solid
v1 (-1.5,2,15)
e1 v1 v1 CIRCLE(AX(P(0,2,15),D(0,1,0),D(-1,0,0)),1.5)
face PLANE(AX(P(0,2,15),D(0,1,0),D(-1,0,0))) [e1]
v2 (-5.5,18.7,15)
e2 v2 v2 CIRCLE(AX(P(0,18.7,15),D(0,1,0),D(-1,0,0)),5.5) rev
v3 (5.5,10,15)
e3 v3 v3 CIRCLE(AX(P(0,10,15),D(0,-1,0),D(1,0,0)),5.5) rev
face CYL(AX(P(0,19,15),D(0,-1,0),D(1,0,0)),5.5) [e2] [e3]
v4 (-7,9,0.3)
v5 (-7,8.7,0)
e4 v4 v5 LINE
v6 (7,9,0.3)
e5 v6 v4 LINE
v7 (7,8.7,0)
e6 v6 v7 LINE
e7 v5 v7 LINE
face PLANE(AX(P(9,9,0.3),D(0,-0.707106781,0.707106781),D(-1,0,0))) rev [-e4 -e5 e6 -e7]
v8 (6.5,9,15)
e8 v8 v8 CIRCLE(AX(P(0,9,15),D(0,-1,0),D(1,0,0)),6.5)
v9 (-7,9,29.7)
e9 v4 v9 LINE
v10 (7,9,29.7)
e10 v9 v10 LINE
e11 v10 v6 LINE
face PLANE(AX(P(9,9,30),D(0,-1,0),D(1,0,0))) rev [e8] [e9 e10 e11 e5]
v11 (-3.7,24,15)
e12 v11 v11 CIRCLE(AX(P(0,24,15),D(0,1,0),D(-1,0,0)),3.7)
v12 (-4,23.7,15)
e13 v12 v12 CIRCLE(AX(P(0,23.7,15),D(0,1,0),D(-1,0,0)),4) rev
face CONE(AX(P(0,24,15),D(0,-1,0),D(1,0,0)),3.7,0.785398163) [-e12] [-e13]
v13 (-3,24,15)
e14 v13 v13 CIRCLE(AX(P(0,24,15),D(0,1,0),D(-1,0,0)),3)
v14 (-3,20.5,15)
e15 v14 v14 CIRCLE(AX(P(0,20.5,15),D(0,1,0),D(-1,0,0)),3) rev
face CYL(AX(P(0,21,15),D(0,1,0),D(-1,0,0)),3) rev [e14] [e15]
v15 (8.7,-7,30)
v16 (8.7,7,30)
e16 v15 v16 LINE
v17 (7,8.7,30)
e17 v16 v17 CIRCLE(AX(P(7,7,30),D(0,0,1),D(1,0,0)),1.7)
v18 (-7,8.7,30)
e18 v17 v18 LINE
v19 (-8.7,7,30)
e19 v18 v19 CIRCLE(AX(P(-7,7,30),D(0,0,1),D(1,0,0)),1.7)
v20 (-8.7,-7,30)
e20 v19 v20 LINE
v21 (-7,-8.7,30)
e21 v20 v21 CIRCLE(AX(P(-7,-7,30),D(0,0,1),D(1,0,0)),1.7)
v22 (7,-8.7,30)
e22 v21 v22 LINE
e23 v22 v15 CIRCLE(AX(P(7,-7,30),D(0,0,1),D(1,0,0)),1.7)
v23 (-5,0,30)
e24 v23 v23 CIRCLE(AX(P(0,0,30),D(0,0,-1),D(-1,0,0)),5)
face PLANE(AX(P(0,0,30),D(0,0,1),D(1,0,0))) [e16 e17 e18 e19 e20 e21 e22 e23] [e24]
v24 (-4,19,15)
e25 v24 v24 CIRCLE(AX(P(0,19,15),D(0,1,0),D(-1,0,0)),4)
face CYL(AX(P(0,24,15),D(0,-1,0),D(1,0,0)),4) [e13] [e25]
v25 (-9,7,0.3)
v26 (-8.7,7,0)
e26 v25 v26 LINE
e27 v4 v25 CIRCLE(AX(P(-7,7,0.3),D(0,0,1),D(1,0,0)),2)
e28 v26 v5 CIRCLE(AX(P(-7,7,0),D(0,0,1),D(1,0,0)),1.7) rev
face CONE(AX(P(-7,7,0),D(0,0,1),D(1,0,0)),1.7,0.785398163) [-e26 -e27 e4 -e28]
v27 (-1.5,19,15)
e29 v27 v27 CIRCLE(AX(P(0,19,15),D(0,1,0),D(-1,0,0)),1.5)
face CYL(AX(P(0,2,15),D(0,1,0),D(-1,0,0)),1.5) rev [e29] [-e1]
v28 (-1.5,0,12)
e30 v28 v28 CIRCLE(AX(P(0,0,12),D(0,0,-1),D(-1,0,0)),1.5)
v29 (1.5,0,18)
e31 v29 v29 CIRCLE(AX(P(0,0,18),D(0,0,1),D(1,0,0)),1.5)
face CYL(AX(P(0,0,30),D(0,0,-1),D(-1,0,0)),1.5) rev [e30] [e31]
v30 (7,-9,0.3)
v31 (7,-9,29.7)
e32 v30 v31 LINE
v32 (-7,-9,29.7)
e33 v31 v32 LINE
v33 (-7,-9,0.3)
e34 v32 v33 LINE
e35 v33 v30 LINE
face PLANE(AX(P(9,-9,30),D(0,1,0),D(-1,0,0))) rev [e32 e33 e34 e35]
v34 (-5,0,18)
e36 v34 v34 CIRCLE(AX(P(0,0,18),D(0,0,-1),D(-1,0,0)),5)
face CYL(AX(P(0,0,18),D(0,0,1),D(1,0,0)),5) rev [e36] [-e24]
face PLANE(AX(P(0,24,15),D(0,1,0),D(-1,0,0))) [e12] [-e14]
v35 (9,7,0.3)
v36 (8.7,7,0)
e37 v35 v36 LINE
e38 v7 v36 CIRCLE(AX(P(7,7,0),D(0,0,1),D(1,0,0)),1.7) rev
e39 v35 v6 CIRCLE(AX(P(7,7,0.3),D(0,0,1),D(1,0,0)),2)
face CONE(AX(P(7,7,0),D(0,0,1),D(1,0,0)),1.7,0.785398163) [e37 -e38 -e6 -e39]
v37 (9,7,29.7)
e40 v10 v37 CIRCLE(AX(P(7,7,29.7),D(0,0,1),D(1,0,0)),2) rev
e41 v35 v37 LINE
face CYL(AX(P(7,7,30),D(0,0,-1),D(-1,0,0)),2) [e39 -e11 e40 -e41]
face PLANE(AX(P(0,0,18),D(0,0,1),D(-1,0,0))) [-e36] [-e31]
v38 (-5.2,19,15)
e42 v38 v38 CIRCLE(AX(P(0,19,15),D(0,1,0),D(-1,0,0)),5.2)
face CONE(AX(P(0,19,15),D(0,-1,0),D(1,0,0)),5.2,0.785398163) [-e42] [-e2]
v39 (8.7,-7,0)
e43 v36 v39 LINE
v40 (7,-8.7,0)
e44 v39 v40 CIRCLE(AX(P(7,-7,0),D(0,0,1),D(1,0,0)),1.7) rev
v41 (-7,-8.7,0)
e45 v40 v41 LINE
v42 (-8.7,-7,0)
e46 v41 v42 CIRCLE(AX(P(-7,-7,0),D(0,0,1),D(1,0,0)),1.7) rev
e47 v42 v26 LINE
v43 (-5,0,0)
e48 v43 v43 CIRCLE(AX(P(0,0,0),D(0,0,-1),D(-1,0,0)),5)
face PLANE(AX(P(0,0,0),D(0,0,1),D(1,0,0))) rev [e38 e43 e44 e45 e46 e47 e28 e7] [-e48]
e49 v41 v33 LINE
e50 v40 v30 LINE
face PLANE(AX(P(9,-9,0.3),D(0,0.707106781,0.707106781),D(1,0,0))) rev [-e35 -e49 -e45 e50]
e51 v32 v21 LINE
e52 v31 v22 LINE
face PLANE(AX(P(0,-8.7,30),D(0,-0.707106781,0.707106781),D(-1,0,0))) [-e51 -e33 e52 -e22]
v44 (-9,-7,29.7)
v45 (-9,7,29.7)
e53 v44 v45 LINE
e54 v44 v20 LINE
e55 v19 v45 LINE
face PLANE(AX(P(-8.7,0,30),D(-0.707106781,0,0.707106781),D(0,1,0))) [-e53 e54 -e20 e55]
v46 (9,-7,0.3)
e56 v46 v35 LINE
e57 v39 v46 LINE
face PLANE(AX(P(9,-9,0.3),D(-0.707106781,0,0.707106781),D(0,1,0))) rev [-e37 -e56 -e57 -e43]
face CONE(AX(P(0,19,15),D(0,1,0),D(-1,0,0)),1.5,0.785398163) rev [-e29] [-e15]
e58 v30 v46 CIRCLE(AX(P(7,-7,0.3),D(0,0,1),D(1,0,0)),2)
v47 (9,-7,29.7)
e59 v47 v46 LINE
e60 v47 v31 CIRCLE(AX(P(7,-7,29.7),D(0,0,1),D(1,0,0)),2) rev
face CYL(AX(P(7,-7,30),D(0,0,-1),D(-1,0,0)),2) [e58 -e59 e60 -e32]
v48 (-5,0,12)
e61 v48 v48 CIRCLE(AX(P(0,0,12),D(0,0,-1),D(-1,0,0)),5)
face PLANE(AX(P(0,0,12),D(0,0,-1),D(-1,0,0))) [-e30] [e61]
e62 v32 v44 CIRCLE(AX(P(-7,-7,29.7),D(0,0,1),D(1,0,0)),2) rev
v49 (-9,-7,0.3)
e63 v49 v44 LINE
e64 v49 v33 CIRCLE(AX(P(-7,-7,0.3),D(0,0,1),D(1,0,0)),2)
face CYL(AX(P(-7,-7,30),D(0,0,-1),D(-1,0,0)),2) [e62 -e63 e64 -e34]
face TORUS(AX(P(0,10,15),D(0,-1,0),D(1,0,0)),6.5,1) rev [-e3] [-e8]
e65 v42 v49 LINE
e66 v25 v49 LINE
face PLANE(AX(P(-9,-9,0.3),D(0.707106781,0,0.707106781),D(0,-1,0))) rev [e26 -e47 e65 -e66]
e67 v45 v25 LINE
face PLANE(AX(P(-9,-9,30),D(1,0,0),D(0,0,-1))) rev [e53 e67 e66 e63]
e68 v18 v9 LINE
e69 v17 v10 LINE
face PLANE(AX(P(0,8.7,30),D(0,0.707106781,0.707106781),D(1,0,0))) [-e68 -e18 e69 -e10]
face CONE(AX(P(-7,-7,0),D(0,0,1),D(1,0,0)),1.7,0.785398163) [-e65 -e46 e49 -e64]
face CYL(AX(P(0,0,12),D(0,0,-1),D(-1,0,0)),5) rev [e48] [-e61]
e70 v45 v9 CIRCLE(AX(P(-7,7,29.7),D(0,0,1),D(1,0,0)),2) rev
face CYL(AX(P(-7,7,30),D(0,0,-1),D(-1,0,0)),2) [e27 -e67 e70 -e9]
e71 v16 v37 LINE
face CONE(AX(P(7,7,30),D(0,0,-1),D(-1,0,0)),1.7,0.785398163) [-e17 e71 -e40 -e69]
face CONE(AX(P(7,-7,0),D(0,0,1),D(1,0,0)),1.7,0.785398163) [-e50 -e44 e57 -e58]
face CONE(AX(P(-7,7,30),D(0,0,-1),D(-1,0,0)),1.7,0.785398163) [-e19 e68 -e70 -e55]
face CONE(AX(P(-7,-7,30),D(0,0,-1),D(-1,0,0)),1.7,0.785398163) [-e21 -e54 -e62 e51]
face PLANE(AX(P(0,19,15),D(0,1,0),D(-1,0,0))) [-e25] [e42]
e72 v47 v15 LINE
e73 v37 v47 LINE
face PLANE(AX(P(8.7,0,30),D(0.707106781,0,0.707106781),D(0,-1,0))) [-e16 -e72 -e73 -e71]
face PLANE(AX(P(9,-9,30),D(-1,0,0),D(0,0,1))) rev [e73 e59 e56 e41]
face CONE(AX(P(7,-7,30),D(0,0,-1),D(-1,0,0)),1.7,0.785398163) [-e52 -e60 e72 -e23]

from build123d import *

# Parameters (mm, degrees)
SKETCH1_W           = 18
SKETCH1_H           = 18
BOSS_EXTRUDE1_DEPTH = 30
FILLET1_R           = 2
SKETCH2_R           = 5
CUT_EXTRUDE1_DEPTH  = 12
SKETCH3_R           = 5.5
BOSS_EXTRUDE2_DEPTH = 10
SKETCH4_R           = 4
BOSS_EXTRUDE3_DEPTH = 5
SKETCH5_R           = 3
CUT_EXTRUDE2_DEPTH  = 3
SKETCH6_R           = 1.5
CUT_EXTRUDE3_DEPTH  = 19
CHAMFER1_SIZE       = 2
FILLET2_R           = 1
SKETCH7_R           = 1.5
CUT_EXTRUDE4_DEPTH  = 32.320919527
CHAMFER2_SIZE       = 0.3


with BuildPart() as part:
    # Sketch1 → Boss-Extrude1 (new body)
    with BuildSketch(Plane.XY):
        Rectangle(SKETCH1_W, SKETCH1_H)
    extrude(amount=BOSS_EXTRUDE1_DEPTH)

    # Fillet1
    fillet1_edges = [part.edges().sort_by_distance(p)[0] for p in [
        (-9, 9, 15),
        (9, 9, 15),
        (9, -9, 15),
        (-9, -9, 15),
    ]]
    fillet(fillet1_edges, radius=FILLET1_R)

    # Sketch2 → Cut-Extrude1 (cut)
    with BuildSketch(Plane(origin=(0, 0, 0), x_dir=(-1, 0, 0), z_dir=(0, 0, -1))):
        Circle(SKETCH2_R)
    cut_extrude1 = extrude(amount=-CUT_EXTRUDE1_DEPTH, mode=Mode.SUBTRACT)

    # Mirror1: Cut-Extrude1 across plane
    add(cut_extrude1.mirror(Plane.XY.offset(15)), mode=Mode.SUBTRACT)

    # Sketch3 → Boss-Extrude2 (add)
    with BuildSketch(Plane(origin=(0, 9, 0), x_dir=(1, 0, 0), z_dir=(0, 1, 0))):
        with Locations((0, -15)):
            Circle(SKETCH3_R)
    extrude(amount=BOSS_EXTRUDE2_DEPTH)

    # Sketch4 → Boss-Extrude3 (add)
    with BuildSketch(Plane(origin=(0, 19, 0), x_dir=(1, 0, 0), z_dir=(0, 1, 0))):
        with Locations(Location((0, -15, 0), (0, 0, 180))):
            Circle(SKETCH4_R)
    extrude(amount=BOSS_EXTRUDE3_DEPTH)

    # Sketch5 → Cut-Extrude2 (cut)
    with BuildSketch(Plane(origin=(0, 24, 0), x_dir=(1, 0, 0), z_dir=(0, 1, 0))):
        with Locations(Location((0, -15, 0), (0, 0, 180))):
            Circle(SKETCH5_R)
    extrude(amount=-CUT_EXTRUDE2_DEPTH, mode=Mode.SUBTRACT)

    # Sketch6 → Cut-Extrude3 (cut)
    with BuildSketch(Plane(origin=(0, 21, 0), x_dir=(1, 0, 0), z_dir=(0, 1, 0))):
        with Locations(Location((0, -15, 0), (0, 0, 180))):
            Circle(SKETCH6_R)
    extrude(amount=-CUT_EXTRUDE3_DEPTH, mode=Mode.SUBTRACT)

    # Chamfer1
    # the kernel refuses this chamfer: 2 mm, written as the material it takes off along each edge
    with BuildSketch(Plane(origin=(0, 21, 15), x_dir=(-1, 0, 0), z_dir=(0, 0, -1))) as chamfer1_piece_1_section:
        Polygon((1.5 + CHAMFER1_SIZE, 0), (1.5, -CHAMFER1_SIZE), (1.5, 0), align=None)
    chamfer1_piece_1 = revolve(axis=Axis((0, 21, 15), (0, 1, 0)), mode=Mode.PRIVATE)
    chamfer1_piece_1 = chamfer1_piece_1 & Plane(origin=(0, 19.742805432, 15), x_dir=(-1, 0, 0), z_dir=(0, 1, 0)) * Cylinder(3, 14, mode=Mode.PRIVATE)
    add(chamfer1_piece_1, mode=Mode.SUBTRACT)

    # Fillet2
    fillet2_edges = [part.edges().sort_by_distance(p)[0] for p in [
        (-5.5, 9, 15),
    ]]
    fillet(fillet2_edges, radius=FILLET2_R)

    # Sketch7 → Cut-Extrude4 (cut, through all)
    with BuildSketch(Plane(origin=(0, 0, 12), x_dir=(-1, 0, 0), z_dir=(0, 0, -1))):
        Circle(SKETCH7_R)
    extrude(amount=-CUT_EXTRUDE4_DEPTH, mode=Mode.SUBTRACT)

    # Chamfer2
    chamfer2_edges = [part.edges().sort_by_distance(p)[0] for p in [
        (9, 0, 0),
        (9, 0, 30),
        (-9, 0, 0),
        (0, 9, 0),
        (0, -9, 0),
        (-8.414213562, 8.414213562, 0),
        (8.414213562, 8.414213562, 0),
        (-8.414213562, -8.414213562, 0),
        (8.414213562, -8.414213562, 0),
        (0, -9, 30),
        (-9, 0, 30),
        (0, 9, 30),
        (-8.414213562, 8.414213562, 30),
        (8.414213562, 8.414213562, 30),
        (-8.414213562, -8.414213562, 30),
        (8.414213562, -8.414213562, 30),
        (-5.5, 19, 15),
        (4, 24, 15),
    ]]
    chamfer(chamfer2_edges, length=CHAMFER2_SIZE)


solid = part.part
